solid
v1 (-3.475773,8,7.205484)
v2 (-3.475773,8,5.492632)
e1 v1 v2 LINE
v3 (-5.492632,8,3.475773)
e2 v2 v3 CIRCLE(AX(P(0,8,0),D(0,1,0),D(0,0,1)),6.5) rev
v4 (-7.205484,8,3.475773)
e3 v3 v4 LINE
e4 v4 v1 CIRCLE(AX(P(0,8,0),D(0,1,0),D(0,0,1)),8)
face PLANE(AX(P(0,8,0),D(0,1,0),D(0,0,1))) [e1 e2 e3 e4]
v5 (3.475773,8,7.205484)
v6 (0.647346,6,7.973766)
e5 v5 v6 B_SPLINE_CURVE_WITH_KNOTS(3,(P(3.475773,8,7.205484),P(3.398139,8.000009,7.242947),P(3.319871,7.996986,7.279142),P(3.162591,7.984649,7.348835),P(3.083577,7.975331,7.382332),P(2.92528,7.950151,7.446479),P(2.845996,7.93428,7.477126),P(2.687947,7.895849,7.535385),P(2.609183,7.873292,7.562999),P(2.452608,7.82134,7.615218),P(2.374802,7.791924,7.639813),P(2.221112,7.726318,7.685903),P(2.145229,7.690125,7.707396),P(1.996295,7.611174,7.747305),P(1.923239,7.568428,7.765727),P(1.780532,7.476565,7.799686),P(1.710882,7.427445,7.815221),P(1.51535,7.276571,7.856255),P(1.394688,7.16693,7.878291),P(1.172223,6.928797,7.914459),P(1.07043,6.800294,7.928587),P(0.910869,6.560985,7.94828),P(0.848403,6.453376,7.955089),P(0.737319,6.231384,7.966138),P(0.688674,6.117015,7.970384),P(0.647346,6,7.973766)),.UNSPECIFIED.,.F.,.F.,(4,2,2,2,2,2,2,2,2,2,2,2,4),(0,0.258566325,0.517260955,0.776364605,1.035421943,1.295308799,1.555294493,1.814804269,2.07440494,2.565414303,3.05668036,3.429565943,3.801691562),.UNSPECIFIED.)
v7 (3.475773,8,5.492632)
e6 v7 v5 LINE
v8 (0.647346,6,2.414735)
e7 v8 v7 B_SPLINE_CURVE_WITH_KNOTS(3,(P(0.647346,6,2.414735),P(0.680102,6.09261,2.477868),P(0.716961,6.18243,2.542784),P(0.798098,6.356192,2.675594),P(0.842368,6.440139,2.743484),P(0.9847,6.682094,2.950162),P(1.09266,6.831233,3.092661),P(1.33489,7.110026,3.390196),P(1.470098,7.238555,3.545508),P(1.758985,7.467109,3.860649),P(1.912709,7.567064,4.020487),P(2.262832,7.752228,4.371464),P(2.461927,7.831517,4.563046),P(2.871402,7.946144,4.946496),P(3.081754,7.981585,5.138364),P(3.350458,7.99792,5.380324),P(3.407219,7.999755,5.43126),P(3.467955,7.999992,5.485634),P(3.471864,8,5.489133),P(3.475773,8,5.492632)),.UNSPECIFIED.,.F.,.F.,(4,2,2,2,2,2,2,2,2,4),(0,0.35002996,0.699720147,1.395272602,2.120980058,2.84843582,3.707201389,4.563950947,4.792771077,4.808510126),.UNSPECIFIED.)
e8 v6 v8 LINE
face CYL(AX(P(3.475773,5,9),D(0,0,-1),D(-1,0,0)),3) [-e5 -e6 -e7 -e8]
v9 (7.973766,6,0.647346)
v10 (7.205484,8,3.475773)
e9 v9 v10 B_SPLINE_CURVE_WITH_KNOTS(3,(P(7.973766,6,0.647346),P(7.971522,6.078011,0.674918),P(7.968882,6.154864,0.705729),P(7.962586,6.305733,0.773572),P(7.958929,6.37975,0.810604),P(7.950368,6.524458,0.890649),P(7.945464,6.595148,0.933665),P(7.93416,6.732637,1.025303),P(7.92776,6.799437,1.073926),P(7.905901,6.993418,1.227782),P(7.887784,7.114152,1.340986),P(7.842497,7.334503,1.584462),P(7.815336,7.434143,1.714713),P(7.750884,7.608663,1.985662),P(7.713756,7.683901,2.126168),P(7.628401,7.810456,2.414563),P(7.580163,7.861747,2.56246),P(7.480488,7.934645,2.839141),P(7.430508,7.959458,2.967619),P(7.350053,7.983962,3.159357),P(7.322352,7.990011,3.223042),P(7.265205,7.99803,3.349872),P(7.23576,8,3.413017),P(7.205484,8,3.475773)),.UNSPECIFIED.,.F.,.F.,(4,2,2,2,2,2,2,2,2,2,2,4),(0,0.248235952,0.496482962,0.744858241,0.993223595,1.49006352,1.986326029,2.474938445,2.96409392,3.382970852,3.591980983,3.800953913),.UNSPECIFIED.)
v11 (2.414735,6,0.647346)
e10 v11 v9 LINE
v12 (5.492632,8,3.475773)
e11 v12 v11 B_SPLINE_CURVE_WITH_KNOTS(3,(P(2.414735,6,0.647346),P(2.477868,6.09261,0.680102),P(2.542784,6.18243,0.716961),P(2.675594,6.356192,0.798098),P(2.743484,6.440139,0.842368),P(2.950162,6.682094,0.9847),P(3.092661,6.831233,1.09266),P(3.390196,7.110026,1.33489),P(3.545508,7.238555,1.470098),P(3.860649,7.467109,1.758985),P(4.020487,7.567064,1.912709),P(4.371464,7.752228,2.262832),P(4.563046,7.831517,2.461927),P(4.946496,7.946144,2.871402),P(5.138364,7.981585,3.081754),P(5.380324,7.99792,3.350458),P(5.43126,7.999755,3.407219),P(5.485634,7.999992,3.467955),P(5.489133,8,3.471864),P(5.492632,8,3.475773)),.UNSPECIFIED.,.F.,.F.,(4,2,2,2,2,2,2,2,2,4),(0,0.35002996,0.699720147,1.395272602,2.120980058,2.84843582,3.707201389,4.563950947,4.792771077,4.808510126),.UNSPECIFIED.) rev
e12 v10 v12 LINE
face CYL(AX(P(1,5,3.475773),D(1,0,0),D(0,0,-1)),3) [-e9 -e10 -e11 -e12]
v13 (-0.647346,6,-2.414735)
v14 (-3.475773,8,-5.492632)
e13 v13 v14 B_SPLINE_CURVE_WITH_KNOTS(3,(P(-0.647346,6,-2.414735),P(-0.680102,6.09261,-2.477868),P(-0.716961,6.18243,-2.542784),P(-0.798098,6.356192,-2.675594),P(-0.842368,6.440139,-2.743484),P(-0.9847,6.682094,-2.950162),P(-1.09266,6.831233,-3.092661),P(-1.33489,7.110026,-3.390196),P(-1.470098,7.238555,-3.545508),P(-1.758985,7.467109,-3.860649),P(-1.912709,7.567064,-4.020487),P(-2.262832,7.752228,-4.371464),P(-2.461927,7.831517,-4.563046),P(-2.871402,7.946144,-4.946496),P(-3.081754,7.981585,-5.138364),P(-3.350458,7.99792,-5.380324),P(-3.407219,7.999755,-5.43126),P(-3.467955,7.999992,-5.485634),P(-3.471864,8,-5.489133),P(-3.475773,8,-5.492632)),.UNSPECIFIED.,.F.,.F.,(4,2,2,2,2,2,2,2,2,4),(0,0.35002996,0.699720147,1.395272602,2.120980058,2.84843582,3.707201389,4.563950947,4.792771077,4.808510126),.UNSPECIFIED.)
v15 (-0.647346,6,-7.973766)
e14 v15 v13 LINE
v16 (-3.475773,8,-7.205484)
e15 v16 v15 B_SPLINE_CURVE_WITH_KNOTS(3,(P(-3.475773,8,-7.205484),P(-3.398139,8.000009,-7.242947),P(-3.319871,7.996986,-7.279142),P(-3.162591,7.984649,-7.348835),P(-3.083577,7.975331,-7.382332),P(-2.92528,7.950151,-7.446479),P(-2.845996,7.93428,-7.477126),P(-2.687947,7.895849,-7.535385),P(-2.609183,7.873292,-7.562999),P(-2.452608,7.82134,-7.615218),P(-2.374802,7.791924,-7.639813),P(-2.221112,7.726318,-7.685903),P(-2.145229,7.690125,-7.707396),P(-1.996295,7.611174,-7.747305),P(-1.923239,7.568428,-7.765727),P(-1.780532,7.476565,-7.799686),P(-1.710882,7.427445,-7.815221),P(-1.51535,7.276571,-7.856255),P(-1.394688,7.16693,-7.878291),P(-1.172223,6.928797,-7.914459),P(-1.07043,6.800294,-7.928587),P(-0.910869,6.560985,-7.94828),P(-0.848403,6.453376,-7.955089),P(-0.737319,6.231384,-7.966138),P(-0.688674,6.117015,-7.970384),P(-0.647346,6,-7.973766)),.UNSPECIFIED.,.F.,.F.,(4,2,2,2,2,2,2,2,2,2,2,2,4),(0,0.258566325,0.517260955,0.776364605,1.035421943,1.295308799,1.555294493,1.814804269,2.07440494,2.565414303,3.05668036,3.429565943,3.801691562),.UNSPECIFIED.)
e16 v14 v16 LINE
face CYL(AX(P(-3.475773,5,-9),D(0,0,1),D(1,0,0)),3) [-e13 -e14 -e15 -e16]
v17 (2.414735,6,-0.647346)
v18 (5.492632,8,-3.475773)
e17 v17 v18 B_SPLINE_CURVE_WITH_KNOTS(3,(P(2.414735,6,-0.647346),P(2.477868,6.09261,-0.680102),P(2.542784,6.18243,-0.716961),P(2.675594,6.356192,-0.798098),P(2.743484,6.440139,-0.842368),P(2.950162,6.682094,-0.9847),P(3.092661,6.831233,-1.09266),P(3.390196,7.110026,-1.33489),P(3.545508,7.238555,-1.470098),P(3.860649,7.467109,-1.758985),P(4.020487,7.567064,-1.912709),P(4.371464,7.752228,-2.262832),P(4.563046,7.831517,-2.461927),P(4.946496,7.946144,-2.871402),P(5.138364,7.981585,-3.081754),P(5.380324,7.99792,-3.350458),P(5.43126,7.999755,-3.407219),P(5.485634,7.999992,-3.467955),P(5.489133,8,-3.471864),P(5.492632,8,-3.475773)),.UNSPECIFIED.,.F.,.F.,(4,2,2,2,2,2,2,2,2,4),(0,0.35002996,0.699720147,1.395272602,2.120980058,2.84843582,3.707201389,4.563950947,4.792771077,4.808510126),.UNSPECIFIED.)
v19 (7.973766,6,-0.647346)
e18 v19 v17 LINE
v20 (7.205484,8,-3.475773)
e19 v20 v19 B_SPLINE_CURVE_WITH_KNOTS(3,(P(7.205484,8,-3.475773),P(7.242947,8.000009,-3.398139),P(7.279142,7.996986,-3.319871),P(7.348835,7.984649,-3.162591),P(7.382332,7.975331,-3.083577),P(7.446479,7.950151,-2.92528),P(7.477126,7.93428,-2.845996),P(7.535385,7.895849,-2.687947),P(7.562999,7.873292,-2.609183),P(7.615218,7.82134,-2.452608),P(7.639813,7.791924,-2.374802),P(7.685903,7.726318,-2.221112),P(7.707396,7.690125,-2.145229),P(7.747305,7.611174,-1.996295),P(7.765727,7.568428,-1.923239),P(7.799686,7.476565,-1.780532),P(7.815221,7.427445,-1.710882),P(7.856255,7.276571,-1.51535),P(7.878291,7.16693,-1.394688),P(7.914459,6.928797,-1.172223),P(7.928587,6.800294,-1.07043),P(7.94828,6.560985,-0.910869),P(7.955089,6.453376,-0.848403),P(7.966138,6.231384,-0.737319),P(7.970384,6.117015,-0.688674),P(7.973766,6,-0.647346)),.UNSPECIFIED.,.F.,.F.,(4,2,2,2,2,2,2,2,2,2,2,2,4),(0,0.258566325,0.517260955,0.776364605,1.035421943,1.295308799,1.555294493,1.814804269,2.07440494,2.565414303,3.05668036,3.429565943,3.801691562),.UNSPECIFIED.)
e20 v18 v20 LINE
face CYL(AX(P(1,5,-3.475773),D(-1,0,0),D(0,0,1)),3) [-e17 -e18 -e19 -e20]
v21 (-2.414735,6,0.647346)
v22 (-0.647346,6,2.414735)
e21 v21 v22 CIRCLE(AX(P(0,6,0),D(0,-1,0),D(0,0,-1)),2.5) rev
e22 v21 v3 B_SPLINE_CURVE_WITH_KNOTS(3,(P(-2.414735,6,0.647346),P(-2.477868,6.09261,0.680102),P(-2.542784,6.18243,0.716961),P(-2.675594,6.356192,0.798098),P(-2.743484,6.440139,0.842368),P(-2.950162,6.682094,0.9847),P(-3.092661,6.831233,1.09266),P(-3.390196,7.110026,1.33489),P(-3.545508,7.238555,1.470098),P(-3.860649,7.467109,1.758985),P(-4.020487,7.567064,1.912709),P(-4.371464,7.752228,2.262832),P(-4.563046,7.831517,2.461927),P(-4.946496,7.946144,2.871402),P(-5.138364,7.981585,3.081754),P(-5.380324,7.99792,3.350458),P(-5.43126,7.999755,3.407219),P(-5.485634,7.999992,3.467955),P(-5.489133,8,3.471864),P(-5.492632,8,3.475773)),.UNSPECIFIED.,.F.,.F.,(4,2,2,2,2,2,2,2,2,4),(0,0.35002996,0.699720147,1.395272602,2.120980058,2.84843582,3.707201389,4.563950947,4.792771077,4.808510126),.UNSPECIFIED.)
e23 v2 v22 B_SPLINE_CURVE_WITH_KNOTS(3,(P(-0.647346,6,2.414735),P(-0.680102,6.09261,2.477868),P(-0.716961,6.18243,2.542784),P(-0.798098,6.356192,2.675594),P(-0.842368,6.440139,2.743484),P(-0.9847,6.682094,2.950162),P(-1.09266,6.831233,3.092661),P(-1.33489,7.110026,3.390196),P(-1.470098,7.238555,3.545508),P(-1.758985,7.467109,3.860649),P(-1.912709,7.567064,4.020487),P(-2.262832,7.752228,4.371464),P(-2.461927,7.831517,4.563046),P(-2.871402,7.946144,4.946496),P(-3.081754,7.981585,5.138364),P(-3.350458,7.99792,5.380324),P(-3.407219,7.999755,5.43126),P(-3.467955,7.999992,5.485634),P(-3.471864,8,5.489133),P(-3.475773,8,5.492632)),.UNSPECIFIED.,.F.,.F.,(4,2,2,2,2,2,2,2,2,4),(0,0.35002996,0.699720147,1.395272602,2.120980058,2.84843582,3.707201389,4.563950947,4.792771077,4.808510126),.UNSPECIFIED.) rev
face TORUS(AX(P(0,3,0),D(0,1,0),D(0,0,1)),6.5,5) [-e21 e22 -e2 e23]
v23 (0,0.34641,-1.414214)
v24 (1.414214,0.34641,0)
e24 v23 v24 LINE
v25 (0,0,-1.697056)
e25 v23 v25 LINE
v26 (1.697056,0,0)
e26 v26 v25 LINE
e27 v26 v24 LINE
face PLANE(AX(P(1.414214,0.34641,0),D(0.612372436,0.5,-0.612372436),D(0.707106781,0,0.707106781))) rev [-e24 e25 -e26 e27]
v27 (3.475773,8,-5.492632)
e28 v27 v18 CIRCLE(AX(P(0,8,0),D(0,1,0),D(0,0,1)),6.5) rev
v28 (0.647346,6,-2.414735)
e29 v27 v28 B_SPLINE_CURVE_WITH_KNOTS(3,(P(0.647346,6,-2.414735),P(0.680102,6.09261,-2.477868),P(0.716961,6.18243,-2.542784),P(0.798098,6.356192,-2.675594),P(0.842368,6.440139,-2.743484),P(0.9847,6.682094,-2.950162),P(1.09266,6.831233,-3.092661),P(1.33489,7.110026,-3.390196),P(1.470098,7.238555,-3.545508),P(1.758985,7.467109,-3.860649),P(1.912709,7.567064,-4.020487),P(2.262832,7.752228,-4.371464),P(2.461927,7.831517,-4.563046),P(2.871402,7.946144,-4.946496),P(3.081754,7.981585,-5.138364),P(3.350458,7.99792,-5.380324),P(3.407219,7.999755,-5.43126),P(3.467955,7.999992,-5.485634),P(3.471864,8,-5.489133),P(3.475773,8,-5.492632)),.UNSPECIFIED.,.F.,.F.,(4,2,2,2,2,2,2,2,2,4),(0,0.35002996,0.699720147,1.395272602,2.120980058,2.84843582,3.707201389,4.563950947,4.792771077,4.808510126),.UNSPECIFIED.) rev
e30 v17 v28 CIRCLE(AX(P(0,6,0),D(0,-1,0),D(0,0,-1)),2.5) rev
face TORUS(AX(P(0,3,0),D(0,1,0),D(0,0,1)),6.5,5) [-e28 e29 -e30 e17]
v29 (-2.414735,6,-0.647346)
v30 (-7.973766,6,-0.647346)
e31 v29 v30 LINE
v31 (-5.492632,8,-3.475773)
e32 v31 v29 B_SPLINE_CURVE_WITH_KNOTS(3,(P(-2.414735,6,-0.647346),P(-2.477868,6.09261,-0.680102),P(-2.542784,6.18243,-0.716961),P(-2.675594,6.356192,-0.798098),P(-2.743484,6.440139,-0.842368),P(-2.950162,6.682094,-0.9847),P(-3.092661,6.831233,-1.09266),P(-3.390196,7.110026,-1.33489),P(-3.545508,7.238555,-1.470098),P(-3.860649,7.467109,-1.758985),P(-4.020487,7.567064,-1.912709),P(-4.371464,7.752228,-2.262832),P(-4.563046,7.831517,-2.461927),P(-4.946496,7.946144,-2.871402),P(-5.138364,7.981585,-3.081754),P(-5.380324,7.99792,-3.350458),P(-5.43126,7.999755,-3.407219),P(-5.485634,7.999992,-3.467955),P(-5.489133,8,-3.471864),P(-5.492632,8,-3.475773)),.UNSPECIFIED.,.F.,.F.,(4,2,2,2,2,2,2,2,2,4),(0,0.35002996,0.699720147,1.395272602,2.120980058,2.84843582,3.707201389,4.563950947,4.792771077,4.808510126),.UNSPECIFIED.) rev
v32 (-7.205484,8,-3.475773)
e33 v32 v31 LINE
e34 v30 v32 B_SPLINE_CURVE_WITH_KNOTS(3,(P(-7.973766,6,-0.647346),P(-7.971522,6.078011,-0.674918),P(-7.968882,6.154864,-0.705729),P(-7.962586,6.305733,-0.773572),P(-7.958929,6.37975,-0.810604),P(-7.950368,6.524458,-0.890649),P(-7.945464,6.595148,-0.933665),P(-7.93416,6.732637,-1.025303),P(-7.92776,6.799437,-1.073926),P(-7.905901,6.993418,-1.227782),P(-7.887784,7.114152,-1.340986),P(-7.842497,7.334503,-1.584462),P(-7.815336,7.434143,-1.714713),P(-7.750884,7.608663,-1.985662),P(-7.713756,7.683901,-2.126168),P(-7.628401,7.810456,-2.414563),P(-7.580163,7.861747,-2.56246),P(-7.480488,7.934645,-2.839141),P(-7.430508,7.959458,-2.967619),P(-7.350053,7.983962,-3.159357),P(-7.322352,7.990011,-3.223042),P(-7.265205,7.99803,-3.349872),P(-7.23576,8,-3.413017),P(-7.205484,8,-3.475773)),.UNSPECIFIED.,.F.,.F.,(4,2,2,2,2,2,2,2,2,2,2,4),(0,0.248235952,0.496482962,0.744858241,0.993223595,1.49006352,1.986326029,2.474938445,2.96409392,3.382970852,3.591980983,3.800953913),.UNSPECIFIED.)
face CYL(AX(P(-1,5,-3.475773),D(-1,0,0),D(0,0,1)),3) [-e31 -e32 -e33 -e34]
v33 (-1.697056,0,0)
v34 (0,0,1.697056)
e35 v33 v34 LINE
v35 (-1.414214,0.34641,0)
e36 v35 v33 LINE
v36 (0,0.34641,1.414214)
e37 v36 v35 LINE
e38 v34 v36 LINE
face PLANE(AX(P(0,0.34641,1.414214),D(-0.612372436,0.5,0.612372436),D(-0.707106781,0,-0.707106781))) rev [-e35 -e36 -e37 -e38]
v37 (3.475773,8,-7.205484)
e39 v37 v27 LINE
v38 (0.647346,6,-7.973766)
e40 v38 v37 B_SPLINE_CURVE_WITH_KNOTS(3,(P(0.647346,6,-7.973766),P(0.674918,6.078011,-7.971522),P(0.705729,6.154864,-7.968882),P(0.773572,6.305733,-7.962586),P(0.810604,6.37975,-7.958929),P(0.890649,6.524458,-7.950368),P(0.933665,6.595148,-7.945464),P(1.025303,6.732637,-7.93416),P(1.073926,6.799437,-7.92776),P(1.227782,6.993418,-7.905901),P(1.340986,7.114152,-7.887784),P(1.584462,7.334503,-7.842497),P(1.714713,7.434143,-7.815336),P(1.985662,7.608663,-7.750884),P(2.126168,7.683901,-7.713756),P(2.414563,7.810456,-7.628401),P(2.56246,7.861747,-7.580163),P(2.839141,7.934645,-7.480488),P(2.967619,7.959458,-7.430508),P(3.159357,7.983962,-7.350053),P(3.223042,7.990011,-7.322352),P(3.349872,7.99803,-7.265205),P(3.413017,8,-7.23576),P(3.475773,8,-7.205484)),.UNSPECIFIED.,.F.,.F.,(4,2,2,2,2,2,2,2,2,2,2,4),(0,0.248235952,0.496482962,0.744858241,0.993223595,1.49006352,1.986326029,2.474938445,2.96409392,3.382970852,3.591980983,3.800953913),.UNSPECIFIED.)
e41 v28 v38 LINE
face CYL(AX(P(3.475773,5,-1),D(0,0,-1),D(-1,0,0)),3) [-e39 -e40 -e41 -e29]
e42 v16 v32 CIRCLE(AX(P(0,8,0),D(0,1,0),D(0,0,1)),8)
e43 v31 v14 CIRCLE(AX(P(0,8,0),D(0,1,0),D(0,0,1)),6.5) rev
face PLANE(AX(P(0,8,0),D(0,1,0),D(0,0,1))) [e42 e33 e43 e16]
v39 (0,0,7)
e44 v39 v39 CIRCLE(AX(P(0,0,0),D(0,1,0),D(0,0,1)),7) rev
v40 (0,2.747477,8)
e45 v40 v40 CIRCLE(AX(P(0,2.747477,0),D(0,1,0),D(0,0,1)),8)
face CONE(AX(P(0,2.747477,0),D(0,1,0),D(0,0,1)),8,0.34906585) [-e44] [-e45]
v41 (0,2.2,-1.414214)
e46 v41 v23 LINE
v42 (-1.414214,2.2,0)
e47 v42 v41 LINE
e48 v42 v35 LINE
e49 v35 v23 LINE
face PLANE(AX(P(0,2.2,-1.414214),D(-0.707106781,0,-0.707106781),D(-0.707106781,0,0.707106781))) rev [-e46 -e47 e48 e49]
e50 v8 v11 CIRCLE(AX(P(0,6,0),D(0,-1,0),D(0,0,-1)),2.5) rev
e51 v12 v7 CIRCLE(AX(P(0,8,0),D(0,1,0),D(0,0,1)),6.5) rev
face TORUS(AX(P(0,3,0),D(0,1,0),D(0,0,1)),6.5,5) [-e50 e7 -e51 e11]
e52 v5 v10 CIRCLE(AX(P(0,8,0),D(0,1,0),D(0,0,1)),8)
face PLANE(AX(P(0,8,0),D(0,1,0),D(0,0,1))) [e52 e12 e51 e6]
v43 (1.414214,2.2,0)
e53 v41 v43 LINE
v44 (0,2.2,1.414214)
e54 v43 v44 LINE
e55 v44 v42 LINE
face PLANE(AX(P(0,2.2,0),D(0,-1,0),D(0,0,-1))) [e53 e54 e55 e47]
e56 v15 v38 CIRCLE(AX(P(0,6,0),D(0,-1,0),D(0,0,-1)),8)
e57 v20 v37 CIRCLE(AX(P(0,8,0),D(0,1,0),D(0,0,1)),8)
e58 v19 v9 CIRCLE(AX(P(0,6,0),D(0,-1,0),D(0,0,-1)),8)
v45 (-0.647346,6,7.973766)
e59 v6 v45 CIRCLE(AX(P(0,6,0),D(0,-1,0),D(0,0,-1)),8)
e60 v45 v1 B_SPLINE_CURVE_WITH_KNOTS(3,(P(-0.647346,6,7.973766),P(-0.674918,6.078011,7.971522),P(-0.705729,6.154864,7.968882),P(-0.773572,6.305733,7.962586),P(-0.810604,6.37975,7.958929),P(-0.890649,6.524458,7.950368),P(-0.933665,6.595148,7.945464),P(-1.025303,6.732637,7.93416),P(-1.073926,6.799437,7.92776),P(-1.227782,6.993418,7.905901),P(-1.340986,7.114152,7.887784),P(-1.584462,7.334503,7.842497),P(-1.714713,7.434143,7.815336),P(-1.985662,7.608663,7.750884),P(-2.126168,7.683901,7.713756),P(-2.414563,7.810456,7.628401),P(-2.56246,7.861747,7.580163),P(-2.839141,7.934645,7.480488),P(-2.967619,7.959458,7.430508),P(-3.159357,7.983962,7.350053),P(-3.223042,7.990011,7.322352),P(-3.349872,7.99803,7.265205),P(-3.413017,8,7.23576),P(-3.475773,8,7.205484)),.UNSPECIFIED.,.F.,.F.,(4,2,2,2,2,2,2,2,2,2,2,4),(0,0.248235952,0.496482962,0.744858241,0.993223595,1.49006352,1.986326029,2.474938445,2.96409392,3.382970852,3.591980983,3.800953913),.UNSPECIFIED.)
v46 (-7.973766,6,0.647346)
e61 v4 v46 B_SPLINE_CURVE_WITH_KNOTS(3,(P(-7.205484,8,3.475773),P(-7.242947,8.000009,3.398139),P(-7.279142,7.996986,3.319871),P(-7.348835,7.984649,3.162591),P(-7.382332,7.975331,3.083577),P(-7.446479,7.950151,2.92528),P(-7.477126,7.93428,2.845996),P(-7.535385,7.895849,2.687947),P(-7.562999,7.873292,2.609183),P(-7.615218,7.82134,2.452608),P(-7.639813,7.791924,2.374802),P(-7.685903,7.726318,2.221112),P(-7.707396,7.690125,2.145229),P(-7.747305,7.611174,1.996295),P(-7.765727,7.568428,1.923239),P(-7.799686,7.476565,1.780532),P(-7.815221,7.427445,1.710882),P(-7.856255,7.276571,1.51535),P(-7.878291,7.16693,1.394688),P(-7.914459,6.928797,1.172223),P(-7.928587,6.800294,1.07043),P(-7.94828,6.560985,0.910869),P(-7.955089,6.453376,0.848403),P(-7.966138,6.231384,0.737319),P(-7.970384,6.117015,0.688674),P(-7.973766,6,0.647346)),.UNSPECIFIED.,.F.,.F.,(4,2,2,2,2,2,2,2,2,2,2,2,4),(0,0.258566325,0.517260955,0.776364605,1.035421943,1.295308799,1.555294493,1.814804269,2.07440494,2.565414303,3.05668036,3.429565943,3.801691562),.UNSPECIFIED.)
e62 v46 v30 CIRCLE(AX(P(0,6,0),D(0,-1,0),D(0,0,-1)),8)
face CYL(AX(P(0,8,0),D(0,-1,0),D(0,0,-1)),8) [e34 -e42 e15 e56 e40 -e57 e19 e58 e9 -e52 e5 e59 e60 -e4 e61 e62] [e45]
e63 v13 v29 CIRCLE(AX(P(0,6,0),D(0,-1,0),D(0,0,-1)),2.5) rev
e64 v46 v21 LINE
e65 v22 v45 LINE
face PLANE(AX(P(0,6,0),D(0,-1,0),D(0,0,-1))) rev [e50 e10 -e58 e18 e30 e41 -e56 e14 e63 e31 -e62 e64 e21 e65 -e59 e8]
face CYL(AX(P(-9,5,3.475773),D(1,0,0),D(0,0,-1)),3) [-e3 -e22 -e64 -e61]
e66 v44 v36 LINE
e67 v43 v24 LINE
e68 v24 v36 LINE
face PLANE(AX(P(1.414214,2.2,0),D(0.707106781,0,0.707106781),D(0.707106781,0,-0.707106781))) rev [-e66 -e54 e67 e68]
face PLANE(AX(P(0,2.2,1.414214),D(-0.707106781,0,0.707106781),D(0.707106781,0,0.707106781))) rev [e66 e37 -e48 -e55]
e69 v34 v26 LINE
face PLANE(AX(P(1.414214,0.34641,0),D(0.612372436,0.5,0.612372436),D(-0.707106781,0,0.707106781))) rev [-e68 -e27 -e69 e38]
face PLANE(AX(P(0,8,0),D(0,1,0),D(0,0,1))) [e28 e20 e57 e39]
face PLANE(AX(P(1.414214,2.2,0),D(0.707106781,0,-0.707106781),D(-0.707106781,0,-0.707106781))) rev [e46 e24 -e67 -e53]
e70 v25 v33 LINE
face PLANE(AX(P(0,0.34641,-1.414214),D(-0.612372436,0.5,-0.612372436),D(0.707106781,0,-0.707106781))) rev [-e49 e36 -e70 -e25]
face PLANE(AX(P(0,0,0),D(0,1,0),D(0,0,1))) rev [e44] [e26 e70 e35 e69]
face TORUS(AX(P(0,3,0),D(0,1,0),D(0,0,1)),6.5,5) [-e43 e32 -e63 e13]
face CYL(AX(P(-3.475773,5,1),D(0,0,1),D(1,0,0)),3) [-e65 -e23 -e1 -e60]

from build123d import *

# Parameters (mm, degrees)
SKETCH3_R           = 8
BOSS_EXTRUDE3_DEPTH = 8
CUT_EXTRUDE2_DEPTH  = 2
CUT_EXTRUDE2_DRAFT  = -10
SKETCH7_R           = 2.5
CUT_EXTRUDE4_DEPTH  = 2
FILLET1_R           = 5
FILLET2_START       = -9
FILLET2_DEPTH       = 18
FILLET2_2_DEPTH     = 18
CUT_EXTRUDE5_DEPTH  = 2.2
CHAMFER2_SIZE       = 0.2
CHAMFER2_SIZE2      = 0.346410162
CHAMFER3_SIZE       = 1
CHAMFER3_SIZE2      = 2.747477419


with BuildPart() as part:
    # Sketch3 → Boss-Extrude3 (new body)
    with BuildSketch(Plane(origin=(0, 0, 0), x_dir=(1, 0, 0), z_dir=(0, 1, 0))):
        with Locations(Location((0, 0, 0), (0, 0, 270))):
            Circle(SKETCH3_R)
    extrude(amount=BOSS_EXTRUDE3_DEPTH)


with BuildPart() as cut_extrude2_tool:
    # Sketch4 → Cut-Extrude2 (with draft: the straight prism first)
    with BuildSketch(Plane(origin=(0, 8, 0), x_dir=(1, 0, 0), z_dir=(0, 1, 0))):
        Polygon((-9, -1), (-1, -1), (-1, -9), (1, -9), (1, -1), (9, -1), (9, 1), (1, 1), (1, 9), (-1, 9), (-1, 1), (-9, 1), align=None)
    extrude(amount=-CUT_EXTRUDE2_DEPTH)
    # Cut-Extrude2: the draft: its side faces are tilted about the plane it starts from
    cut_extrude2_sides = [cut_extrude2_tool.faces().sort_by_distance(p)[0] for p in [
        (-5, 7, 1),
        (-1, 7, 5),
        (0, 7, 9),
        (1, 7, 5),
        (5, 7, 1),
        (9, 7, 0),
        (5, 7, -1),
        (1, 7, -5),
        (0, 7, -9),
        (-1, 7, -5),
        (-5, 7, -1),
        (-9, 7, 0),
    ]]
    draft(cut_extrude2_sides, Plane(origin=(0, 8, 0), x_dir=(1, 0, 0), z_dir=(0, 1, 0)), CUT_EXTRUDE2_DRAFT)


with BuildPart() as part_1:
    add(part.part)

    # Cut-Extrude2: cut by cut_extrude2_tool
    add(cut_extrude2_tool.part, mode=Mode.SUBTRACT)

    # Sketch7 → Cut-Extrude4 (cut)
    with BuildSketch(Plane(origin=(0, 8, 0), x_dir=(1, 0, 0), z_dir=(0, 1, 0))):
        Circle(SKETCH7_R)
    extrude(amount=-CUT_EXTRUDE4_DEPTH, mode=Mode.SUBTRACT)

    # Fillet1
    # the kernel refuses this fillet: 5 mm, written as the material it takes off along each edge
    with BuildSketch(Plane(origin=(0, 8, 0), x_dir=(-0.7093247295722765, 0, -0.7048818539423588), z_dir=(0.7048818539423588, 0, -0.7093247295722765))) as fillet1_piece_1:
        with BuildLine():
            CenterArc((6.5, -5), FILLET1_R, 90, 53.130102354)
            Line((2.5, -2), (2.42, -1.94))
            ThreePointArc((2.42, -1.94), (2.4, -1), (2.4, 0))
            Line((2.4, 0), (2.5, 0.1))
            Line((2.5, 0.1), (6.5, 0.1))
            Line((6.5, 0.1), (6.5, 0))
        make_face()
    revolve(axis=Axis((0, 8, 0), (0, 1, 0)), revolution_arc=359.64, mode=Mode.SUBTRACT)
    with BuildSketch(Plane(origin=(0, 8, 0), x_dir=(0.7048818539423484, 0, -0.7093247295722869), z_dir=(0.7093247295722869, 0, 0.7048818539423484))) as fillet1_piece_2:
        with BuildLine():
            CenterArc((6.5, -5), FILLET1_R, 90, 53.130102354)
            Line((2.5, -2), (2.42, -1.94))
            ThreePointArc((2.42, -1.94), (2.4, -1), (2.4, 0))
            Line((2.4, 0), (2.5, 0.1))
            Line((2.5, 0.1), (6.5, 0.1))
            Line((6.5, 0.1), (6.5, 0))
        make_face()
    revolve(axis=Axis((0, 8, 0), (0, 1, 0)), revolution_arc=359.64, mode=Mode.SUBTRACT)
    with BuildSketch(Plane(origin=(0, 8, 0), x_dir=(0.7093247295722607, 0, 0.7048818539423748), z_dir=(-0.7048818539423748, 0, 0.7093247295722607))) as fillet1_piece_3:
        with BuildLine():
            CenterArc((6.5, -5), FILLET1_R, 90, 53.130102354)
            Line((2.5, -2), (2.42, -1.94))
            ThreePointArc((2.42, -1.94), (2.4, -1), (2.4, 0))
            Line((2.4, 0), (2.5, 0.1))
            Line((2.5, 0.1), (6.5, 0.1))
            Line((6.5, 0.1), (6.5, 0))
        make_face()
    revolve(axis=Axis((0, 8, 0), (0, 1, 0)), revolution_arc=359.64, mode=Mode.SUBTRACT)
    with BuildSketch(Plane(origin=(0, 8, 0), x_dir=(-0.704881853942364, 0, 0.7093247295722713), z_dir=(-0.7093247295722713, 0, -0.704881853942364))) as fillet1_piece_4:
        with BuildLine():
            CenterArc((6.5, -5), FILLET1_R, 90, 53.130102354)
            Line((2.5, -2), (2.42, -1.94))
            ThreePointArc((2.42, -1.94), (2.4, -1), (2.4, 0))
            Line((2.4, 0), (2.5, 0.1))
            Line((2.5, 0.1), (6.5, 0.1))
            Line((6.5, 0.1), (6.5, 0))
        make_face()
    revolve(axis=Axis((0, 8, 0), (0, 1, 0)), revolution_arc=359.64, mode=Mode.SUBTRACT)

    # Fillet2: read off the stored shape, not the designer's step
    # Fillet2 outline → Fillet2 (cut)
    with BuildSketch(Plane.XY.offset(FILLET2_START)):
        with BuildLine():
            ThreePointArc((-3.475773163, 8), (-1.743722356, 7.449489743), (-0.647346039, 6))
            Line((-0.647346039, 6), (-1, 8))
            Line((-1, 8), (-3.475773163, 8))
        make_face()
        with BuildLine():
            Line((1, 8), (0.647346039, 6))
            ThreePointArc((0.647346039, 6), (1.743722356, 7.449489743), (3.475773163, 8))
            Line((3.475773163, 8), (1, 8))
        make_face()
    extrude(amount=FILLET2_DEPTH, mode=Mode.SUBTRACT)

    # Fillet2 2 outline → Fillet2 2 (cut)
    with BuildSketch(Plane.YZ.offset(FILLET2_START)):
        with BuildLine():
            ThreePointArc((8, 3.475773163), (7.449489743, 1.743722356), (6, 0.647346039))
            Line((6, 0.647346039), (8, 1))
            Line((8, 1), (8, 3.475773163))
        make_face()
        with BuildLine():
            Line((8, -1), (6, -0.647346039))
            ThreePointArc((6, -0.647346039), (7.449489743, -1.743722356), (8, -3.475773163))
            Line((8, -3.475773163), (8, -1))
        make_face()
    extrude(amount=FILLET2_2_DEPTH, mode=Mode.SUBTRACT)

    # Sketch5 → Cut-Extrude5 (cut)
    with BuildSketch(Plane.XZ):
        Polygon((1.414213562, 0), (0, -1.414213562), (-1.414213562, 0), (0, 1.414213562), align=None)
    extrude(amount=-CUT_EXTRUDE5_DEPTH, mode=Mode.SUBTRACT)

    # Chamfer2
    chamfer2_edges = [part_1.edges().sort_by_distance(p)[0] for p in [
        (0.7071067811865474, 0, 0.7071067811865479),
        (-0.7071067811865476, 0, 0.7071067811865477),
        (-0.7071067811865474, 0, -0.7071067811865474),
        (0.7071067811865477, 0, -0.7071067811865471),
    ]]
    chamfer2_side = [part_1.faces().sort_by_distance(p)[0] for p in [
        (0, 0, -7.77372583),
    ]]
    chamfer(chamfer2_edges, length=CHAMFER2_SIZE, length2=CHAMFER2_SIZE2, reference=chamfer2_side[0])

    # Chamfer3
    chamfer3_edges = [part_1.edges().sort_by_distance(p)[0] for p in [
        (0, 0, -8),
    ]]
    chamfer3_side = [part_1.faces().sort_by_distance(p)[0] for p in [
        (1.008528137, 0, 1.008528137),
    ]]
    chamfer(chamfer3_edges, length=CHAMFER3_SIZE, length2=CHAMFER3_SIZE2, reference=chamfer3_side[0])


solid = part_1.part
